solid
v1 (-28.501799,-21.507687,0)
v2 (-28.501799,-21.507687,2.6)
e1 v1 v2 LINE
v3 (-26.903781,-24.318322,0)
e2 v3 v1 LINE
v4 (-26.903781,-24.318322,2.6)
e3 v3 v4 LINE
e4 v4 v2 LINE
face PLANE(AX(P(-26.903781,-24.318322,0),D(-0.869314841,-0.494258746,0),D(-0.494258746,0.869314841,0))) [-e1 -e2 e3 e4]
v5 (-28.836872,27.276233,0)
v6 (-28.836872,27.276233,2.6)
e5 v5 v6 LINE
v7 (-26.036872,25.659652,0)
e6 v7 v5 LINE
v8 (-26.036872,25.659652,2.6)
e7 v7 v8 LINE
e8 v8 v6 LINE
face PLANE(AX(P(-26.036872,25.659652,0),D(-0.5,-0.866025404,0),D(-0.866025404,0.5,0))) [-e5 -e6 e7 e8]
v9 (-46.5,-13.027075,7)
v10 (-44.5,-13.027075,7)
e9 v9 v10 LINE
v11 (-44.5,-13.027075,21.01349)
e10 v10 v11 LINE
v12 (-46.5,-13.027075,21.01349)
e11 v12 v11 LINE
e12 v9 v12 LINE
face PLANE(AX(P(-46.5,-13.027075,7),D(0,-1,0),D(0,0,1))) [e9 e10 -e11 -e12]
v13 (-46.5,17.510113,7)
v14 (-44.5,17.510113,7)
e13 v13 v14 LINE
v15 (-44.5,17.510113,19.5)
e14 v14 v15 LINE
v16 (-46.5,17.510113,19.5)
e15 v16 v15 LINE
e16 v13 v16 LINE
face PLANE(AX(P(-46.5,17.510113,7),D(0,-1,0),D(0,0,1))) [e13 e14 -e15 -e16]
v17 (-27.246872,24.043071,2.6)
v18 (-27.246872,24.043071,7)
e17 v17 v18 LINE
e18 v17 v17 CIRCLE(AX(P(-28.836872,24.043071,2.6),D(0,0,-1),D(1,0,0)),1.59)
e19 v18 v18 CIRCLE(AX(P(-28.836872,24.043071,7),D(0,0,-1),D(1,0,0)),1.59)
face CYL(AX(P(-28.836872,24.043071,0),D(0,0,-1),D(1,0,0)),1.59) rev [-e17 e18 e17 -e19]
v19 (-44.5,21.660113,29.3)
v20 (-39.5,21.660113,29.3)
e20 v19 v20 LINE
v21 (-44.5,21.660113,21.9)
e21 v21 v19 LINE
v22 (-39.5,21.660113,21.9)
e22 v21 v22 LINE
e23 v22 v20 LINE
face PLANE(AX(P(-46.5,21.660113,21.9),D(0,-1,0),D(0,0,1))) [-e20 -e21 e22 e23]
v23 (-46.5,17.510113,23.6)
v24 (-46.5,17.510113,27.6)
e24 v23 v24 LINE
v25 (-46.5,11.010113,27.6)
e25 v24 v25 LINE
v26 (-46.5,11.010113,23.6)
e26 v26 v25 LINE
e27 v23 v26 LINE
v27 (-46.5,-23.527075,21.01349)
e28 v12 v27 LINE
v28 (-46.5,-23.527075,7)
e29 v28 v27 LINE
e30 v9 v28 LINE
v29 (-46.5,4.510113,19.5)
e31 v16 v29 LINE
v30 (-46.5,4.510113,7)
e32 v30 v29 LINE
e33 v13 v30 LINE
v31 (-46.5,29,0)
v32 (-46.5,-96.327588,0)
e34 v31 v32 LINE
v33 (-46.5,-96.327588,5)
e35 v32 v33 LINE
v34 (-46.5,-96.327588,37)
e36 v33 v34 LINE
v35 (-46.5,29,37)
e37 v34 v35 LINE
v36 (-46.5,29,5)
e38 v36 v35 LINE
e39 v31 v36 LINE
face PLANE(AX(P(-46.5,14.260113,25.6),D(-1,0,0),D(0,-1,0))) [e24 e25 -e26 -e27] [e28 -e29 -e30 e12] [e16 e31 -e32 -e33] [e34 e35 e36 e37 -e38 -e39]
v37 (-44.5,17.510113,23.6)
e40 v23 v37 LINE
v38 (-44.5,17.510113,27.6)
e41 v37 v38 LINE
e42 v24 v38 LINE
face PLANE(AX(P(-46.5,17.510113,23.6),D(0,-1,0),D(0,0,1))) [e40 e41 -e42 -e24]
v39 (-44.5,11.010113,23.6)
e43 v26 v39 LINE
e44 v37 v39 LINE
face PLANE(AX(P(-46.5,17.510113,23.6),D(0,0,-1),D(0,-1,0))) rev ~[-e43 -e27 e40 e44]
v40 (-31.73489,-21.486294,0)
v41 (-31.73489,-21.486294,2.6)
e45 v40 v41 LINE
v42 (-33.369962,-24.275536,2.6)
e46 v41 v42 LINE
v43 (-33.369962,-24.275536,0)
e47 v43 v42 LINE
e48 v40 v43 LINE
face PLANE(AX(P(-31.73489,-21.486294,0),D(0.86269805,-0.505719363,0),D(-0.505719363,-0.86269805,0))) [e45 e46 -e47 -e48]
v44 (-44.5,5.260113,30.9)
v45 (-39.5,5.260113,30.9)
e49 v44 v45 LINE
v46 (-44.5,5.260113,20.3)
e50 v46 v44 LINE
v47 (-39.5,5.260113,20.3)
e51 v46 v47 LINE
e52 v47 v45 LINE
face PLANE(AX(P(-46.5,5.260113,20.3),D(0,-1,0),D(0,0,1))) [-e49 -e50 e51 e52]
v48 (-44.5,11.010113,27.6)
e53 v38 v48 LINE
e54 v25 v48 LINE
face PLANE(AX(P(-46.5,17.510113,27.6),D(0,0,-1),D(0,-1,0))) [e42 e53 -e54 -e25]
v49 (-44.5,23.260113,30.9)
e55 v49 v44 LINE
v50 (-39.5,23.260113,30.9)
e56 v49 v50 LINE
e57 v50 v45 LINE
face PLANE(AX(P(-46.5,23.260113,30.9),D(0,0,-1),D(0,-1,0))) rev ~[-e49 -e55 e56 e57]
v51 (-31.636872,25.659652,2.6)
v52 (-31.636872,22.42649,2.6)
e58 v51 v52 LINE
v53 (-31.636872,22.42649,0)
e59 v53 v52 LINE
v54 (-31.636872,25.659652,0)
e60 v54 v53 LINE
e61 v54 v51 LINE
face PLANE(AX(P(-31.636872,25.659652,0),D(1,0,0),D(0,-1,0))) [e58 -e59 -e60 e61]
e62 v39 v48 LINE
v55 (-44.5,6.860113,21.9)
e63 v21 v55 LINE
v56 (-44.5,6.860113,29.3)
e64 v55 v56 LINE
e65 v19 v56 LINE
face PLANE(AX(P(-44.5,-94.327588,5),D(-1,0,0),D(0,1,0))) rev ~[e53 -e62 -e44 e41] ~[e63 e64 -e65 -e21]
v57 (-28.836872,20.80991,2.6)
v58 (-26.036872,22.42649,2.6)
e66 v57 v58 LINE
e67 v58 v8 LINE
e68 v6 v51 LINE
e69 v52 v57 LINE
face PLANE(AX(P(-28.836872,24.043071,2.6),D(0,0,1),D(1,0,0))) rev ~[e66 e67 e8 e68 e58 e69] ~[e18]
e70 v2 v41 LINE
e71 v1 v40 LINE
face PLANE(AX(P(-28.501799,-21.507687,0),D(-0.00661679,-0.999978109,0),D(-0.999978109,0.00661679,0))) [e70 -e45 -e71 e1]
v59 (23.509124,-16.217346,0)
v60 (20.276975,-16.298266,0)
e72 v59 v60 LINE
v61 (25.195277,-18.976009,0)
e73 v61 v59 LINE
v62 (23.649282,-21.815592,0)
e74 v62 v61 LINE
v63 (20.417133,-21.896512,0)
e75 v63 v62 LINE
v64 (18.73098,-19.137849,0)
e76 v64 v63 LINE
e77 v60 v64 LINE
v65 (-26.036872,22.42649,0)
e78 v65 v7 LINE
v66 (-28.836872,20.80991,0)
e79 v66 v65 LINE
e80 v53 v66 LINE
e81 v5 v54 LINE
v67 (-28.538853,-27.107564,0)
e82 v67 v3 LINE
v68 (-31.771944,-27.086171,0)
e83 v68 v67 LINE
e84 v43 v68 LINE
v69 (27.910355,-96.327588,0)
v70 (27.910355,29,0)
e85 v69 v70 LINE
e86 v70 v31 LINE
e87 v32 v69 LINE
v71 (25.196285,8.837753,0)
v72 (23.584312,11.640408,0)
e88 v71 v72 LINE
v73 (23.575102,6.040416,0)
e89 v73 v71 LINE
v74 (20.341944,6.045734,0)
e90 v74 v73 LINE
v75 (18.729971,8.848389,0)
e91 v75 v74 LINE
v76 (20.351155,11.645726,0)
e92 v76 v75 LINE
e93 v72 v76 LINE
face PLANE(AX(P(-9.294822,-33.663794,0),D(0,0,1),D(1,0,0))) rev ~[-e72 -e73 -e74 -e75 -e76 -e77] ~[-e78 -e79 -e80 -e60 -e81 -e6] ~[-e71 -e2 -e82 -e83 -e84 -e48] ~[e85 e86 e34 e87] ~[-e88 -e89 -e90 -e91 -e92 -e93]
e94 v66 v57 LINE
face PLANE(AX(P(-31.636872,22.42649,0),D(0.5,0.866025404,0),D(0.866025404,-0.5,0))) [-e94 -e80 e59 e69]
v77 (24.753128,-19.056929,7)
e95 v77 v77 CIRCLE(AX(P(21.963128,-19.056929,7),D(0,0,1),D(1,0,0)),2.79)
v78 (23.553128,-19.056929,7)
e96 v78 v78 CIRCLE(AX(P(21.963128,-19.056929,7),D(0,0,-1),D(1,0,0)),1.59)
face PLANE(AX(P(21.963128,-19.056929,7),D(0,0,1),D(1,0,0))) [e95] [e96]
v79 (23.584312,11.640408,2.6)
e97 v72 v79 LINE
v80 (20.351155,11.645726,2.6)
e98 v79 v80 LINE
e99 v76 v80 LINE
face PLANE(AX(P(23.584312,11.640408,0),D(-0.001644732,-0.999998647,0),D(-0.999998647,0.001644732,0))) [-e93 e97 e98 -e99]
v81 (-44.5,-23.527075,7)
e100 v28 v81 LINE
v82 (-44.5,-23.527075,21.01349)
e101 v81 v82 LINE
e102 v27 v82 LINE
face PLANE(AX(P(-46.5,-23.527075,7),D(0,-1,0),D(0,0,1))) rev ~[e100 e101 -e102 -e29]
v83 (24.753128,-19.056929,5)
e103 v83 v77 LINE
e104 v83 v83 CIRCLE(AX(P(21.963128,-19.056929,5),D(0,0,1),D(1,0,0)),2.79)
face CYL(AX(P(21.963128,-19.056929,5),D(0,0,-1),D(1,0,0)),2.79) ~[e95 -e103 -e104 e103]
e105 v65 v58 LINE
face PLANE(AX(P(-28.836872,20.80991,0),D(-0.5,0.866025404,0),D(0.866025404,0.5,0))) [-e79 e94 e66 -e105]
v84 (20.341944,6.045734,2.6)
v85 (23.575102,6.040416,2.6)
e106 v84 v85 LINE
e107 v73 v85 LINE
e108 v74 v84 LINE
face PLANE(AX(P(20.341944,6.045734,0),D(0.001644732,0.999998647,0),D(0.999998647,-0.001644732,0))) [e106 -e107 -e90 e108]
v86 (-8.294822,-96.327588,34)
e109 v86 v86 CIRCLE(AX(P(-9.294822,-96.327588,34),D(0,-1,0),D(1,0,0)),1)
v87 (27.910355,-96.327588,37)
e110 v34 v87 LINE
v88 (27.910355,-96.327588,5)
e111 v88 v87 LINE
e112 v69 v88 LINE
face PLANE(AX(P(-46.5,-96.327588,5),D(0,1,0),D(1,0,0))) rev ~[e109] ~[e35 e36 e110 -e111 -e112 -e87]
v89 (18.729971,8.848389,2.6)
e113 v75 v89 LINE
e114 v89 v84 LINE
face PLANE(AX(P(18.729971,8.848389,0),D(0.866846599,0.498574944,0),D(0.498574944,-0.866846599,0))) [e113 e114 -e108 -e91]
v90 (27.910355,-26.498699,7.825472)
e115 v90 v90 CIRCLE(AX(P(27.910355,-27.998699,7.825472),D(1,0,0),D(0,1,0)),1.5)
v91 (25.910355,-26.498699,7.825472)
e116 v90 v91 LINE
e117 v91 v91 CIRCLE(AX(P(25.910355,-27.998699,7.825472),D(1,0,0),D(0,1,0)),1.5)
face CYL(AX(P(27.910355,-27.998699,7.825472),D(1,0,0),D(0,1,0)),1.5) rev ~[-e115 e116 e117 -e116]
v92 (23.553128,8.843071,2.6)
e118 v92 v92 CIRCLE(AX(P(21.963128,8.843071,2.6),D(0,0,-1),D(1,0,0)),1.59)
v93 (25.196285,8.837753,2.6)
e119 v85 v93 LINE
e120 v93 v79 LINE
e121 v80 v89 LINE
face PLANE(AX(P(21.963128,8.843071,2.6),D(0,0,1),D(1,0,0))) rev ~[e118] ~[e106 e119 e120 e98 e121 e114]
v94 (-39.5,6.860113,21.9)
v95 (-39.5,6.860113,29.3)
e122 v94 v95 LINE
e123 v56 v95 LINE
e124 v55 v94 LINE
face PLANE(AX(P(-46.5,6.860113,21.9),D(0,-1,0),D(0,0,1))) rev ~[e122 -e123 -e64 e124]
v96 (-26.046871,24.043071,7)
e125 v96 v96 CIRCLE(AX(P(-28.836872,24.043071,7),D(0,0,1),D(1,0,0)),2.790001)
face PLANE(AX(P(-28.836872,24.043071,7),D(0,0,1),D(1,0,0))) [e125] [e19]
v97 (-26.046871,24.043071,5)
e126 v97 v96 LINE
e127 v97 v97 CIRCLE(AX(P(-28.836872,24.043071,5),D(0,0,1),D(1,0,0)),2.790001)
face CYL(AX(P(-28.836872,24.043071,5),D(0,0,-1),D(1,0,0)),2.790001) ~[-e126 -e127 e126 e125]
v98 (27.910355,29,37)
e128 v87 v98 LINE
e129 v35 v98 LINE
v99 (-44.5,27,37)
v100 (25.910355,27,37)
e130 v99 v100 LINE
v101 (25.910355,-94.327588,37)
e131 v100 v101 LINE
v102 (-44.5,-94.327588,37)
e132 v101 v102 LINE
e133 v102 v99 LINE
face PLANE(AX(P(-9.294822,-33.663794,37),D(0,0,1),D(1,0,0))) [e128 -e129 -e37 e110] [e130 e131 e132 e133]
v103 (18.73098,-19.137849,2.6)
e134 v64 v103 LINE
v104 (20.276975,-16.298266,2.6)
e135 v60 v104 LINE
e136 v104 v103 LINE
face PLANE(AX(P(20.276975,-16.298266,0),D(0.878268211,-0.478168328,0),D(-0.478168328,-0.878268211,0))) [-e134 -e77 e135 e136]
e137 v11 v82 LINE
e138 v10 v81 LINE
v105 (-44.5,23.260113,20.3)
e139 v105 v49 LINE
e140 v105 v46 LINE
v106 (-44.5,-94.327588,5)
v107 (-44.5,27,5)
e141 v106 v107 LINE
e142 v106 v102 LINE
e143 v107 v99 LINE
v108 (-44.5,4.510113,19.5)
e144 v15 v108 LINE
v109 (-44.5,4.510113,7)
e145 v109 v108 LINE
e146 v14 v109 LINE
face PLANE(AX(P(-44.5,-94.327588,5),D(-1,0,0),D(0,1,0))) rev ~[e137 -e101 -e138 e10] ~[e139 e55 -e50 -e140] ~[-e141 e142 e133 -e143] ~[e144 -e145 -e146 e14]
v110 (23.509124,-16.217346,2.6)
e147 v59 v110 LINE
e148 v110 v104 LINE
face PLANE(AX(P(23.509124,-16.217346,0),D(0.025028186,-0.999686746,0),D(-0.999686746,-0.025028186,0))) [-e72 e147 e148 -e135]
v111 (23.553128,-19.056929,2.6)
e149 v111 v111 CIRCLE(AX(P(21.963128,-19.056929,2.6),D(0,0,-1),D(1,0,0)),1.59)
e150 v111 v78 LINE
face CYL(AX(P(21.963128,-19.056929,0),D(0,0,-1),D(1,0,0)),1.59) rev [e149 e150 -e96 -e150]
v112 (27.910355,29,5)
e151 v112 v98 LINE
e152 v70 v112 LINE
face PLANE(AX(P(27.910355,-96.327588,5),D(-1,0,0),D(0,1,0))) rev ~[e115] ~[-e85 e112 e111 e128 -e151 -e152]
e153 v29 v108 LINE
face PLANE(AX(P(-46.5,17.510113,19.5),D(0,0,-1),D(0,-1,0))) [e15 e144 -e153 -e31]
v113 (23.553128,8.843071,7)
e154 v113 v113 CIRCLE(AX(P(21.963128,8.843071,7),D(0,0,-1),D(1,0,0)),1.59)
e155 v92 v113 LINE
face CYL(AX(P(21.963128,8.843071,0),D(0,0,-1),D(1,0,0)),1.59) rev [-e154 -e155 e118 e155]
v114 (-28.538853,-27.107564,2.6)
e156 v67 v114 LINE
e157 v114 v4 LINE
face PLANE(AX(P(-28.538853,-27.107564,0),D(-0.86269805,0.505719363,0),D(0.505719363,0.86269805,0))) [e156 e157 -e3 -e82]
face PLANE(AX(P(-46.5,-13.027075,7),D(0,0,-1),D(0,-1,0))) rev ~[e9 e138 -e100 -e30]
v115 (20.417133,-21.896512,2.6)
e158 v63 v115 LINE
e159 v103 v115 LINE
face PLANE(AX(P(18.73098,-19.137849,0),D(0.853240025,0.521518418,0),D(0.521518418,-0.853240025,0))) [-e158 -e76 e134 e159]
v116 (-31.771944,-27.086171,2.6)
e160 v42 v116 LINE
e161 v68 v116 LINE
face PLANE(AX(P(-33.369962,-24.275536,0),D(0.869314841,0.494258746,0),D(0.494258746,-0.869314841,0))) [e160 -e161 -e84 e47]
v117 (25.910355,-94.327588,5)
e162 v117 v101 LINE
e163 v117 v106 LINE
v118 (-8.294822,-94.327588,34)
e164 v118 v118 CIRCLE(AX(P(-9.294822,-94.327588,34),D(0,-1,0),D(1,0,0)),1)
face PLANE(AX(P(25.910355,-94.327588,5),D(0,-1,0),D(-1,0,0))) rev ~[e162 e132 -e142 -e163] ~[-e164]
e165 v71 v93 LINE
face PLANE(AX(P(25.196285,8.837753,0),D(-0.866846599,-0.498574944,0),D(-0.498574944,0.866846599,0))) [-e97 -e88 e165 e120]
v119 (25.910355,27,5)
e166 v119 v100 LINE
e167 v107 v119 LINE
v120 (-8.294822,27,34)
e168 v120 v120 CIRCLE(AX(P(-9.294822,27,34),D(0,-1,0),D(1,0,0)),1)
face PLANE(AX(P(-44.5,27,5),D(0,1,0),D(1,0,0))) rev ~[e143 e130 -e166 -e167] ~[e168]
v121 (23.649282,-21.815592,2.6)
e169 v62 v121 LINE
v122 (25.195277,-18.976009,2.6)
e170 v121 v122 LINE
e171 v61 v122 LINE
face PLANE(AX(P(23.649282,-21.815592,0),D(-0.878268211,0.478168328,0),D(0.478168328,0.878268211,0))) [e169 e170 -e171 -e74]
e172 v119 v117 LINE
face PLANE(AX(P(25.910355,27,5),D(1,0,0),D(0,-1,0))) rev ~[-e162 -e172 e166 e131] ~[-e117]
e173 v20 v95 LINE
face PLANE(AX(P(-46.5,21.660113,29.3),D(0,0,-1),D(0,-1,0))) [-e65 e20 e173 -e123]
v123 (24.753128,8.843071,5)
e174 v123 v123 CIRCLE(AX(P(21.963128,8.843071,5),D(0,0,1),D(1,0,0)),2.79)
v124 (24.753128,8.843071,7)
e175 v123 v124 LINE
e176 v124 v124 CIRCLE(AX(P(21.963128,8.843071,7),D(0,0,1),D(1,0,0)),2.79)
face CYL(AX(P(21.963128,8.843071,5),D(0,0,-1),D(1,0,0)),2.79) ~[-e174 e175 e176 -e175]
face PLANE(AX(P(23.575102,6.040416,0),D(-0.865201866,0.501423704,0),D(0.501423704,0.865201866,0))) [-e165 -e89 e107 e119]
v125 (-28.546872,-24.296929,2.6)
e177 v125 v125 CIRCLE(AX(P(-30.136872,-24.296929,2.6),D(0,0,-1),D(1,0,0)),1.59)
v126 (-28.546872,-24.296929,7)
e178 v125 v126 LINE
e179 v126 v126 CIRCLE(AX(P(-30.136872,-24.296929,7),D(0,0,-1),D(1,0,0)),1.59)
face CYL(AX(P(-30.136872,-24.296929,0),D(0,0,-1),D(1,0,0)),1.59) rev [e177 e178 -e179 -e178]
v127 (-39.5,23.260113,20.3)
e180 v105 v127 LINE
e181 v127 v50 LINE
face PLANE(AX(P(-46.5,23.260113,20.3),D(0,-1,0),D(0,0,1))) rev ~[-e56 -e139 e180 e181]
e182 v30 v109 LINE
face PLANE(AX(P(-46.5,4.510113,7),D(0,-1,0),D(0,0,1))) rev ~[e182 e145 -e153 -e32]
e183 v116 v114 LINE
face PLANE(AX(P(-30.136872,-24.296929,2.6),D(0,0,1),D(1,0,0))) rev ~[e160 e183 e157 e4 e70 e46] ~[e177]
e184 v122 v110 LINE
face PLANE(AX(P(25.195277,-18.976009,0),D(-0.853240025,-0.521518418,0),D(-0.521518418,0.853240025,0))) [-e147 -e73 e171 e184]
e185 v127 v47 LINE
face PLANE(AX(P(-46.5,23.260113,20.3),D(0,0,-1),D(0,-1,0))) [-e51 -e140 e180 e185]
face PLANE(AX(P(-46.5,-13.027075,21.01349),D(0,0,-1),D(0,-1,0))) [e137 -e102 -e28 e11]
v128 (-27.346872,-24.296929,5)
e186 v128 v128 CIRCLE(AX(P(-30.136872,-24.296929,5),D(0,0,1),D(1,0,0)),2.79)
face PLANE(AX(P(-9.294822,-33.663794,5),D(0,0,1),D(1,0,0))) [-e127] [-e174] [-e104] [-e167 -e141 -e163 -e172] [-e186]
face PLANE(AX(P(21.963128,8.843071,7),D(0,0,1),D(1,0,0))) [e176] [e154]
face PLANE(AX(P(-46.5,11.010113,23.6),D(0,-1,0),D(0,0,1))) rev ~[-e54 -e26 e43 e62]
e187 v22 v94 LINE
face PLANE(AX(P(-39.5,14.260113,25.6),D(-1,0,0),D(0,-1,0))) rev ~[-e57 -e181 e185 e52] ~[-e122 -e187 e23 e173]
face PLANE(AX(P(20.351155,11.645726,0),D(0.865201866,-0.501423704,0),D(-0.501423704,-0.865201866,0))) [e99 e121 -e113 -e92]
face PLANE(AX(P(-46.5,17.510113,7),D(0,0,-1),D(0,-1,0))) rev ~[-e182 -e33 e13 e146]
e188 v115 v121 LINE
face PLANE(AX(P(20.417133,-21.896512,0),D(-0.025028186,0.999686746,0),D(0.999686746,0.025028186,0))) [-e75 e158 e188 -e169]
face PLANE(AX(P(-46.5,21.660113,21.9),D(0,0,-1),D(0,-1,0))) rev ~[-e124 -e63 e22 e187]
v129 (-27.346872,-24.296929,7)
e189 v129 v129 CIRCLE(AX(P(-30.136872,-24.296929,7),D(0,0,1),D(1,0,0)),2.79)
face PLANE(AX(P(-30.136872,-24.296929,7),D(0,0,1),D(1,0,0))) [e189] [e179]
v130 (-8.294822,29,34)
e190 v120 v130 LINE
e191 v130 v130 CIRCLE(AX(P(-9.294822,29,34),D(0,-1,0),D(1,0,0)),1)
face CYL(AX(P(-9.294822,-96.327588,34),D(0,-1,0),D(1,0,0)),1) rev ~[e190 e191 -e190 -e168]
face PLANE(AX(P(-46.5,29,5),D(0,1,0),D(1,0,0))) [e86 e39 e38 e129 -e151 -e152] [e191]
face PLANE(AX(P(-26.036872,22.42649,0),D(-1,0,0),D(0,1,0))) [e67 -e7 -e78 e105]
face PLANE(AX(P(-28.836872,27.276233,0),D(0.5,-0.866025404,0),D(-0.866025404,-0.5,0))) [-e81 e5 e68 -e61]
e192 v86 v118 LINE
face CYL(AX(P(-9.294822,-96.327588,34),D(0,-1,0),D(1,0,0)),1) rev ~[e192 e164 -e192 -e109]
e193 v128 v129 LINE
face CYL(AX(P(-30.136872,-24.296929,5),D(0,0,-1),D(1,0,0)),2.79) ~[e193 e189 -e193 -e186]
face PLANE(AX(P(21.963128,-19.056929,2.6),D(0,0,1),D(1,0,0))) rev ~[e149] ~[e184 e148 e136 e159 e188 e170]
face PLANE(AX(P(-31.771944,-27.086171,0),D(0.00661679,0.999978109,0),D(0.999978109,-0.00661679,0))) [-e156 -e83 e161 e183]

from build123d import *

# Parameters (mm, degrees)
F0_R      = 1.59
F1_DEPTH  = 5
F2_W      = 74.4103554785
F2_H      = 125.3275879622
F3_DEPTH  = 32
F4_R      = 2.7900010005
F4_R_2    = 2.7899997517
F4_R_3    = 2.79
F5_DEPTH  = 2
F6_DEPTH  = 37.001
F8_DEPTH  = 2.6
F9_W      = 13
F9_H      = 12.5
F9_W_2    = 10.5
F9_H_2    = 14.01349
F9_W_3    = 6.5
F9_H_3    = 4
F10_DEPTH = 3
F9_W_4    = 17.9999999672
F9_H_4    = 10.5999999672
F9_W_5    = 14.8
F9_H_5    = 7.4
F11_DEPTH = 7
F13_DEPTH = 6
F14_R     = 1
F15_DEPTH = 125.3285879622
F16_R     = 1.5
F17_DEPTH = 3


# Not quite as in the source:
# - a feature names something its author has since deleted; it is built from what else it names


with BuildPart() as f1:
    # F0 (on Top) → F1 (new body)
    with BuildSketch(Plane.XY):
        Polygon((27.9103554785, 29), (-46.5, 29), (-46.5, -29), (-46.5, -96.3275879622), (27.9103554785, -96.3275879622), align=None)
        with Locations((-30.1368717179, -24.2969288903)):
            Circle(F0_R, mode=Mode.SUBTRACT)
        with Locations((-28.8368717179, 24.0430711097)):
            Circle(F0_R, mode=Mode.SUBTRACT)
        with Locations((21.9631282821, -19.0569288903)):
            Circle(F0_R, mode=Mode.SUBTRACT)
        with Locations((21.9631282821, 8.8430711097)):
            Circle(F0_R, mode=Mode.SUBTRACT)
        with Locations((21.9631282821, -19.0569288903)):
            Circle(F0_R)
        with Locations((-28.8368717179, 24.0430711097)):
            Circle(F0_R)
        with Locations((-30.1368717179, -24.2969288903)):
            Circle(F0_R)
        with Locations((21.9631282821, 8.8430711097)):
            Circle(F0_R)
    extrude(amount=F1_DEPTH)

    # F2 (on face) → F3 (join)
    with BuildSketch(Plane.XY.offset(5)):
        with Locations((-9.2948222607, -33.6637939811)):
            Rectangle(F2_W, F2_H)
        Polygon((25.9103551507, 26.9999996722), (25.9103551507, -94.3275876343), (-44.4999996722, -94.3275876343), (-44.4999996722, -29), (-44.4999996722, 26.9999996722), align=None, mode=Mode.SUBTRACT)
    extrude(amount=F3_DEPTH)

    # F4 (on face) → F5 (join)
    with BuildSketch(Plane.XY.offset(5)):
        with Locations((-28.8368717179, 24.0430711097)):
            Circle(F4_R)
        with Locations((21.9631282821, 8.8430711097)):
            Circle(F4_R_2)
        with Locations((21.9631282821, -19.0569288903)):
            Circle(F4_R_3)
        with Locations((-30.1368717179, -24.2969288903)):
            Circle(F4_R_3)
    extrude(amount=F5_DEPTH)

    # F0 (on Top) → F6 (cut, through all)
    with BuildSketch(Plane.XY):
        with Locations((-30.1368717179, -24.2969288903)):
            Circle(F0_R)
        with Locations((21.9631282821, -19.0569288903)):
            Circle(F0_R)
        with Locations((21.9631282821, 8.8430711097)):
            Circle(F0_R)
        with Locations((-28.8368717179, 24.0430711097)):
            Circle(F0_R)
    extrude(amount=F6_DEPTH, mode=Mode.SUBTRACT)

    # F7 (on Top) → F8 (cut)
    with BuildSketch(Plane.XY):
        Polygon((-28.5388533662, -27.1075641711), (-26.9037809882, -24.3183220425), (-28.5017993398, -21.5076867618), (-31.7348900695, -21.4862936096), (-33.3699624476, -24.2755357382), (-31.7719440959, -27.0861710189), align=None)
        Polygon((23.649281557, -21.8155916945), (25.1952769884, -18.9760087217), (23.5091237135, -16.2173459175), (20.2769750072, -16.2982660862), (18.7309795758, -19.137849059), (20.4171328507, -21.8965118631), align=None)
        Polygon((23.5751015985, 6.040416054), (25.1962854165, 8.837753424), (23.5843121002, 11.6404084796), (20.3511549658, 11.6457261653), (18.7299711478, 8.8483887953), (20.3419444641, 6.0457337397), align=None)
        Polygon((-28.8368717179, 20.8099096022), (-26.0368717179, 22.4264903559), (-26.0368717179, 25.6596518634), (-28.8368717179, 27.2762326171), (-31.6368717179, 25.6596518634), (-31.6368717179, 22.4264903559), align=None)
    extrude(amount=F8_DEPTH, mode=Mode.SUBTRACT)

    # F9 (on face) → F10 (cut)
    with BuildSketch(Plane(origin=(-46.5, 0, 0), x_dir=(0, -1, 0), z_dir=(-1, 0, 0))):
        with Locations((-11.010112679, 13.25)):
            Rectangle(F9_W, F9_H)
        with Locations((18.2770747468, 14.006745)):
            Rectangle(F9_W_2, F9_H_2)
        with Locations((-14.260112679, 25.6000000164)):
            Rectangle(F9_W_3, F9_H_3)
    extrude(amount=-F10_DEPTH, mode=Mode.SUBTRACT)

    # F9 (on face) → F11 (join)
    with BuildSketch(Plane(origin=(-46.5, 0, 0), x_dir=(0, -1, 0), z_dir=(-1, 0, 0))):
        with Locations((-14.260112679, 25.6000000164)):
            Rectangle(F9_W_4, F9_H_4)
        with Locations((-14.260112679, 25.6000000164)):
            Rectangle(F9_W_5, F9_H_5, mode=Mode.SUBTRACT)
    extrude(amount=-F11_DEPTH)

    # F12 (on face) → F13 (cut)
    with BuildSketch(Plane.XY.offset(5)):
        with BuildLine():
            ThreePointArc((-40.7473873347, 2.5), (-41.9973873347, 1.25), (-40.7473873347, 0))
            Line((-40.7473873347, 0), (-10.7473873347, 0))
            ThreePointArc((-10.7473873347, 0), (-9.4973873347, 1.25), (-10.7473873347, 2.5))
            Line((-10.7473873347, 2.5), (-40.7473873347, 2.5))
        make_face()
        with BuildLine():
            ThreePointArc((-40.7473873347, -2.0948293991), (-41.9973873347, -3.3448293991), (-40.7473873347, -4.5948293991))
            Line((-40.7473873347, -4.5948293991), (-10.7473873347, -4.5948293991))
            ThreePointArc((-10.7473873347, -4.5948293991), (-9.4973873347, -3.3448293991), (-10.7473873347, -2.0948293991))
            Line((-10.7473873347, -2.0948293991), (-40.7473873347, -2.0948293991))
        make_face()
        with BuildLine():
            ThreePointArc((-40.7473873347, -6.6774361208), (-41.9973873347, -7.9274361208), (-40.7473873347, -9.1774361208))
            Line((-40.7473873347, -9.1774361208), (-10.7473873347, -9.1774361208))
            ThreePointArc((-10.7473873347, -9.1774361208), (-9.4973873347, -7.9274361208), (-10.7473873347, -6.6774361208))
            Line((-10.7473873347, -6.6774361208), (-40.7473873347, -6.6774361208))
        make_face()
        with BuildLine():
            ThreePointArc((-40.7473873347, -11.2855438516), (-41.9973873347, -12.5355438516), (-40.7473873347, -13.7855438516))
            Line((-40.7473873347, -13.7855438516), (-10.7473873347, -13.7855438516))
            ThreePointArc((-10.7473873347, -13.7855438516), (-9.4973873347, -12.5355438516), (-10.7473873347, -11.2855438516))
            Line((-10.7473873347, -11.2855438516), (-40.7473873347, -11.2855438516))
        make_face()
        with BuildLine():
            ThreePointArc((-40.7473873347, -15.9455886483), (-41.9973873347, -17.1955886483), (-40.7473873347, -18.4455886483))
            Line((-40.7473873347, -18.4455886483), (-10.7473873347, -18.4455886483))
            ThreePointArc((-10.7473873347, -18.4455886483), (-9.4973873347, -17.1955886483), (-10.7473873347, -15.9455886483))
            Line((-10.7473873347, -15.9455886483), (-40.7473873347, -15.9455886483))
        make_face()
        with BuildLine():
            ThreePointArc((-40.7473873347, 6.6440958157), (-41.9973873347, 5.3940958157), (-40.7473873347, 4.1440958157))
            Line((-40.7473873347, 4.1440958157), (-10.7473873347, 4.1440958157))
            ThreePointArc((-10.7473873347, 4.1440958157), (-9.4973873347, 5.3940958157), (-10.7473873347, 6.6440958157))
            Line((-10.7473873347, 6.6440958157), (-40.7473873347, 6.6440958157))
        make_face()
        with BuildLine():
            ThreePointArc((-40.7473873347, 11.013558656), (-41.9973873347, 9.763558656), (-40.7473873347, 8.513558656))
            Line((-40.7473873347, 8.513558656), (-10.7473873347, 8.513558656))
            ThreePointArc((-10.7473873347, 8.513558656), (-9.4973873347, 9.763558656), (-10.7473873347, 11.013558656))
            Line((-10.7473873347, 11.013558656), (-40.7473873347, 11.013558656))
        make_face()
        with BuildLine():
            ThreePointArc((-40.7473873347, 15.4895936698), (-41.9973873347, 14.2395936698), (-40.7473873347, 12.9895936698))
            Line((-40.7473873347, 12.9895936698), (-10.7473873347, 12.9895936698))
            ThreePointArc((-10.7473873347, 12.9895936698), (-9.4973873347, 14.2395936698), (-10.7473873347, 15.4895936698))
            Line((-10.7473873347, 15.4895936698), (-40.7473873347, 15.4895936698))
        make_face()
        with BuildLine():
            ThreePointArc((-40.7473873347, 19.7524824739), (-41.9973873347, 18.5024824739), (-40.7473873347, 17.2524824739))
            Line((-40.7473873347, 17.2524824739), (-10.7473873347, 17.2524824739))
            ThreePointArc((-10.7473873347, 17.2524824739), (-9.4973873347, 18.5024824739), (-10.7473873347, 19.7524824739))
            Line((-10.7473873347, 19.7524824739), (-40.7473873347, 19.7524824739))
        make_face()
    extrude(amount=F13_DEPTH, mode=Mode.SUBTRACT)

    # F14 (on face) → F15 (cut, through all)
    with BuildSketch(Plane.XZ.offset(96.3275879622)):
        with Locations((-9.2948222607, 34)):
            Circle(F14_R)
    extrude(amount=-F15_DEPTH, mode=Mode.SUBTRACT)

    # F16 (on face) → F17 (cut)
    with BuildSketch(Plane.YZ.offset(27.9103554785)):
        with Locations((-27.9986988753, 7.8254723921)):
            Circle(F16_R)
    extrude(amount=-F17_DEPTH, mode=Mode.SUBTRACT)


solid = f1.part
